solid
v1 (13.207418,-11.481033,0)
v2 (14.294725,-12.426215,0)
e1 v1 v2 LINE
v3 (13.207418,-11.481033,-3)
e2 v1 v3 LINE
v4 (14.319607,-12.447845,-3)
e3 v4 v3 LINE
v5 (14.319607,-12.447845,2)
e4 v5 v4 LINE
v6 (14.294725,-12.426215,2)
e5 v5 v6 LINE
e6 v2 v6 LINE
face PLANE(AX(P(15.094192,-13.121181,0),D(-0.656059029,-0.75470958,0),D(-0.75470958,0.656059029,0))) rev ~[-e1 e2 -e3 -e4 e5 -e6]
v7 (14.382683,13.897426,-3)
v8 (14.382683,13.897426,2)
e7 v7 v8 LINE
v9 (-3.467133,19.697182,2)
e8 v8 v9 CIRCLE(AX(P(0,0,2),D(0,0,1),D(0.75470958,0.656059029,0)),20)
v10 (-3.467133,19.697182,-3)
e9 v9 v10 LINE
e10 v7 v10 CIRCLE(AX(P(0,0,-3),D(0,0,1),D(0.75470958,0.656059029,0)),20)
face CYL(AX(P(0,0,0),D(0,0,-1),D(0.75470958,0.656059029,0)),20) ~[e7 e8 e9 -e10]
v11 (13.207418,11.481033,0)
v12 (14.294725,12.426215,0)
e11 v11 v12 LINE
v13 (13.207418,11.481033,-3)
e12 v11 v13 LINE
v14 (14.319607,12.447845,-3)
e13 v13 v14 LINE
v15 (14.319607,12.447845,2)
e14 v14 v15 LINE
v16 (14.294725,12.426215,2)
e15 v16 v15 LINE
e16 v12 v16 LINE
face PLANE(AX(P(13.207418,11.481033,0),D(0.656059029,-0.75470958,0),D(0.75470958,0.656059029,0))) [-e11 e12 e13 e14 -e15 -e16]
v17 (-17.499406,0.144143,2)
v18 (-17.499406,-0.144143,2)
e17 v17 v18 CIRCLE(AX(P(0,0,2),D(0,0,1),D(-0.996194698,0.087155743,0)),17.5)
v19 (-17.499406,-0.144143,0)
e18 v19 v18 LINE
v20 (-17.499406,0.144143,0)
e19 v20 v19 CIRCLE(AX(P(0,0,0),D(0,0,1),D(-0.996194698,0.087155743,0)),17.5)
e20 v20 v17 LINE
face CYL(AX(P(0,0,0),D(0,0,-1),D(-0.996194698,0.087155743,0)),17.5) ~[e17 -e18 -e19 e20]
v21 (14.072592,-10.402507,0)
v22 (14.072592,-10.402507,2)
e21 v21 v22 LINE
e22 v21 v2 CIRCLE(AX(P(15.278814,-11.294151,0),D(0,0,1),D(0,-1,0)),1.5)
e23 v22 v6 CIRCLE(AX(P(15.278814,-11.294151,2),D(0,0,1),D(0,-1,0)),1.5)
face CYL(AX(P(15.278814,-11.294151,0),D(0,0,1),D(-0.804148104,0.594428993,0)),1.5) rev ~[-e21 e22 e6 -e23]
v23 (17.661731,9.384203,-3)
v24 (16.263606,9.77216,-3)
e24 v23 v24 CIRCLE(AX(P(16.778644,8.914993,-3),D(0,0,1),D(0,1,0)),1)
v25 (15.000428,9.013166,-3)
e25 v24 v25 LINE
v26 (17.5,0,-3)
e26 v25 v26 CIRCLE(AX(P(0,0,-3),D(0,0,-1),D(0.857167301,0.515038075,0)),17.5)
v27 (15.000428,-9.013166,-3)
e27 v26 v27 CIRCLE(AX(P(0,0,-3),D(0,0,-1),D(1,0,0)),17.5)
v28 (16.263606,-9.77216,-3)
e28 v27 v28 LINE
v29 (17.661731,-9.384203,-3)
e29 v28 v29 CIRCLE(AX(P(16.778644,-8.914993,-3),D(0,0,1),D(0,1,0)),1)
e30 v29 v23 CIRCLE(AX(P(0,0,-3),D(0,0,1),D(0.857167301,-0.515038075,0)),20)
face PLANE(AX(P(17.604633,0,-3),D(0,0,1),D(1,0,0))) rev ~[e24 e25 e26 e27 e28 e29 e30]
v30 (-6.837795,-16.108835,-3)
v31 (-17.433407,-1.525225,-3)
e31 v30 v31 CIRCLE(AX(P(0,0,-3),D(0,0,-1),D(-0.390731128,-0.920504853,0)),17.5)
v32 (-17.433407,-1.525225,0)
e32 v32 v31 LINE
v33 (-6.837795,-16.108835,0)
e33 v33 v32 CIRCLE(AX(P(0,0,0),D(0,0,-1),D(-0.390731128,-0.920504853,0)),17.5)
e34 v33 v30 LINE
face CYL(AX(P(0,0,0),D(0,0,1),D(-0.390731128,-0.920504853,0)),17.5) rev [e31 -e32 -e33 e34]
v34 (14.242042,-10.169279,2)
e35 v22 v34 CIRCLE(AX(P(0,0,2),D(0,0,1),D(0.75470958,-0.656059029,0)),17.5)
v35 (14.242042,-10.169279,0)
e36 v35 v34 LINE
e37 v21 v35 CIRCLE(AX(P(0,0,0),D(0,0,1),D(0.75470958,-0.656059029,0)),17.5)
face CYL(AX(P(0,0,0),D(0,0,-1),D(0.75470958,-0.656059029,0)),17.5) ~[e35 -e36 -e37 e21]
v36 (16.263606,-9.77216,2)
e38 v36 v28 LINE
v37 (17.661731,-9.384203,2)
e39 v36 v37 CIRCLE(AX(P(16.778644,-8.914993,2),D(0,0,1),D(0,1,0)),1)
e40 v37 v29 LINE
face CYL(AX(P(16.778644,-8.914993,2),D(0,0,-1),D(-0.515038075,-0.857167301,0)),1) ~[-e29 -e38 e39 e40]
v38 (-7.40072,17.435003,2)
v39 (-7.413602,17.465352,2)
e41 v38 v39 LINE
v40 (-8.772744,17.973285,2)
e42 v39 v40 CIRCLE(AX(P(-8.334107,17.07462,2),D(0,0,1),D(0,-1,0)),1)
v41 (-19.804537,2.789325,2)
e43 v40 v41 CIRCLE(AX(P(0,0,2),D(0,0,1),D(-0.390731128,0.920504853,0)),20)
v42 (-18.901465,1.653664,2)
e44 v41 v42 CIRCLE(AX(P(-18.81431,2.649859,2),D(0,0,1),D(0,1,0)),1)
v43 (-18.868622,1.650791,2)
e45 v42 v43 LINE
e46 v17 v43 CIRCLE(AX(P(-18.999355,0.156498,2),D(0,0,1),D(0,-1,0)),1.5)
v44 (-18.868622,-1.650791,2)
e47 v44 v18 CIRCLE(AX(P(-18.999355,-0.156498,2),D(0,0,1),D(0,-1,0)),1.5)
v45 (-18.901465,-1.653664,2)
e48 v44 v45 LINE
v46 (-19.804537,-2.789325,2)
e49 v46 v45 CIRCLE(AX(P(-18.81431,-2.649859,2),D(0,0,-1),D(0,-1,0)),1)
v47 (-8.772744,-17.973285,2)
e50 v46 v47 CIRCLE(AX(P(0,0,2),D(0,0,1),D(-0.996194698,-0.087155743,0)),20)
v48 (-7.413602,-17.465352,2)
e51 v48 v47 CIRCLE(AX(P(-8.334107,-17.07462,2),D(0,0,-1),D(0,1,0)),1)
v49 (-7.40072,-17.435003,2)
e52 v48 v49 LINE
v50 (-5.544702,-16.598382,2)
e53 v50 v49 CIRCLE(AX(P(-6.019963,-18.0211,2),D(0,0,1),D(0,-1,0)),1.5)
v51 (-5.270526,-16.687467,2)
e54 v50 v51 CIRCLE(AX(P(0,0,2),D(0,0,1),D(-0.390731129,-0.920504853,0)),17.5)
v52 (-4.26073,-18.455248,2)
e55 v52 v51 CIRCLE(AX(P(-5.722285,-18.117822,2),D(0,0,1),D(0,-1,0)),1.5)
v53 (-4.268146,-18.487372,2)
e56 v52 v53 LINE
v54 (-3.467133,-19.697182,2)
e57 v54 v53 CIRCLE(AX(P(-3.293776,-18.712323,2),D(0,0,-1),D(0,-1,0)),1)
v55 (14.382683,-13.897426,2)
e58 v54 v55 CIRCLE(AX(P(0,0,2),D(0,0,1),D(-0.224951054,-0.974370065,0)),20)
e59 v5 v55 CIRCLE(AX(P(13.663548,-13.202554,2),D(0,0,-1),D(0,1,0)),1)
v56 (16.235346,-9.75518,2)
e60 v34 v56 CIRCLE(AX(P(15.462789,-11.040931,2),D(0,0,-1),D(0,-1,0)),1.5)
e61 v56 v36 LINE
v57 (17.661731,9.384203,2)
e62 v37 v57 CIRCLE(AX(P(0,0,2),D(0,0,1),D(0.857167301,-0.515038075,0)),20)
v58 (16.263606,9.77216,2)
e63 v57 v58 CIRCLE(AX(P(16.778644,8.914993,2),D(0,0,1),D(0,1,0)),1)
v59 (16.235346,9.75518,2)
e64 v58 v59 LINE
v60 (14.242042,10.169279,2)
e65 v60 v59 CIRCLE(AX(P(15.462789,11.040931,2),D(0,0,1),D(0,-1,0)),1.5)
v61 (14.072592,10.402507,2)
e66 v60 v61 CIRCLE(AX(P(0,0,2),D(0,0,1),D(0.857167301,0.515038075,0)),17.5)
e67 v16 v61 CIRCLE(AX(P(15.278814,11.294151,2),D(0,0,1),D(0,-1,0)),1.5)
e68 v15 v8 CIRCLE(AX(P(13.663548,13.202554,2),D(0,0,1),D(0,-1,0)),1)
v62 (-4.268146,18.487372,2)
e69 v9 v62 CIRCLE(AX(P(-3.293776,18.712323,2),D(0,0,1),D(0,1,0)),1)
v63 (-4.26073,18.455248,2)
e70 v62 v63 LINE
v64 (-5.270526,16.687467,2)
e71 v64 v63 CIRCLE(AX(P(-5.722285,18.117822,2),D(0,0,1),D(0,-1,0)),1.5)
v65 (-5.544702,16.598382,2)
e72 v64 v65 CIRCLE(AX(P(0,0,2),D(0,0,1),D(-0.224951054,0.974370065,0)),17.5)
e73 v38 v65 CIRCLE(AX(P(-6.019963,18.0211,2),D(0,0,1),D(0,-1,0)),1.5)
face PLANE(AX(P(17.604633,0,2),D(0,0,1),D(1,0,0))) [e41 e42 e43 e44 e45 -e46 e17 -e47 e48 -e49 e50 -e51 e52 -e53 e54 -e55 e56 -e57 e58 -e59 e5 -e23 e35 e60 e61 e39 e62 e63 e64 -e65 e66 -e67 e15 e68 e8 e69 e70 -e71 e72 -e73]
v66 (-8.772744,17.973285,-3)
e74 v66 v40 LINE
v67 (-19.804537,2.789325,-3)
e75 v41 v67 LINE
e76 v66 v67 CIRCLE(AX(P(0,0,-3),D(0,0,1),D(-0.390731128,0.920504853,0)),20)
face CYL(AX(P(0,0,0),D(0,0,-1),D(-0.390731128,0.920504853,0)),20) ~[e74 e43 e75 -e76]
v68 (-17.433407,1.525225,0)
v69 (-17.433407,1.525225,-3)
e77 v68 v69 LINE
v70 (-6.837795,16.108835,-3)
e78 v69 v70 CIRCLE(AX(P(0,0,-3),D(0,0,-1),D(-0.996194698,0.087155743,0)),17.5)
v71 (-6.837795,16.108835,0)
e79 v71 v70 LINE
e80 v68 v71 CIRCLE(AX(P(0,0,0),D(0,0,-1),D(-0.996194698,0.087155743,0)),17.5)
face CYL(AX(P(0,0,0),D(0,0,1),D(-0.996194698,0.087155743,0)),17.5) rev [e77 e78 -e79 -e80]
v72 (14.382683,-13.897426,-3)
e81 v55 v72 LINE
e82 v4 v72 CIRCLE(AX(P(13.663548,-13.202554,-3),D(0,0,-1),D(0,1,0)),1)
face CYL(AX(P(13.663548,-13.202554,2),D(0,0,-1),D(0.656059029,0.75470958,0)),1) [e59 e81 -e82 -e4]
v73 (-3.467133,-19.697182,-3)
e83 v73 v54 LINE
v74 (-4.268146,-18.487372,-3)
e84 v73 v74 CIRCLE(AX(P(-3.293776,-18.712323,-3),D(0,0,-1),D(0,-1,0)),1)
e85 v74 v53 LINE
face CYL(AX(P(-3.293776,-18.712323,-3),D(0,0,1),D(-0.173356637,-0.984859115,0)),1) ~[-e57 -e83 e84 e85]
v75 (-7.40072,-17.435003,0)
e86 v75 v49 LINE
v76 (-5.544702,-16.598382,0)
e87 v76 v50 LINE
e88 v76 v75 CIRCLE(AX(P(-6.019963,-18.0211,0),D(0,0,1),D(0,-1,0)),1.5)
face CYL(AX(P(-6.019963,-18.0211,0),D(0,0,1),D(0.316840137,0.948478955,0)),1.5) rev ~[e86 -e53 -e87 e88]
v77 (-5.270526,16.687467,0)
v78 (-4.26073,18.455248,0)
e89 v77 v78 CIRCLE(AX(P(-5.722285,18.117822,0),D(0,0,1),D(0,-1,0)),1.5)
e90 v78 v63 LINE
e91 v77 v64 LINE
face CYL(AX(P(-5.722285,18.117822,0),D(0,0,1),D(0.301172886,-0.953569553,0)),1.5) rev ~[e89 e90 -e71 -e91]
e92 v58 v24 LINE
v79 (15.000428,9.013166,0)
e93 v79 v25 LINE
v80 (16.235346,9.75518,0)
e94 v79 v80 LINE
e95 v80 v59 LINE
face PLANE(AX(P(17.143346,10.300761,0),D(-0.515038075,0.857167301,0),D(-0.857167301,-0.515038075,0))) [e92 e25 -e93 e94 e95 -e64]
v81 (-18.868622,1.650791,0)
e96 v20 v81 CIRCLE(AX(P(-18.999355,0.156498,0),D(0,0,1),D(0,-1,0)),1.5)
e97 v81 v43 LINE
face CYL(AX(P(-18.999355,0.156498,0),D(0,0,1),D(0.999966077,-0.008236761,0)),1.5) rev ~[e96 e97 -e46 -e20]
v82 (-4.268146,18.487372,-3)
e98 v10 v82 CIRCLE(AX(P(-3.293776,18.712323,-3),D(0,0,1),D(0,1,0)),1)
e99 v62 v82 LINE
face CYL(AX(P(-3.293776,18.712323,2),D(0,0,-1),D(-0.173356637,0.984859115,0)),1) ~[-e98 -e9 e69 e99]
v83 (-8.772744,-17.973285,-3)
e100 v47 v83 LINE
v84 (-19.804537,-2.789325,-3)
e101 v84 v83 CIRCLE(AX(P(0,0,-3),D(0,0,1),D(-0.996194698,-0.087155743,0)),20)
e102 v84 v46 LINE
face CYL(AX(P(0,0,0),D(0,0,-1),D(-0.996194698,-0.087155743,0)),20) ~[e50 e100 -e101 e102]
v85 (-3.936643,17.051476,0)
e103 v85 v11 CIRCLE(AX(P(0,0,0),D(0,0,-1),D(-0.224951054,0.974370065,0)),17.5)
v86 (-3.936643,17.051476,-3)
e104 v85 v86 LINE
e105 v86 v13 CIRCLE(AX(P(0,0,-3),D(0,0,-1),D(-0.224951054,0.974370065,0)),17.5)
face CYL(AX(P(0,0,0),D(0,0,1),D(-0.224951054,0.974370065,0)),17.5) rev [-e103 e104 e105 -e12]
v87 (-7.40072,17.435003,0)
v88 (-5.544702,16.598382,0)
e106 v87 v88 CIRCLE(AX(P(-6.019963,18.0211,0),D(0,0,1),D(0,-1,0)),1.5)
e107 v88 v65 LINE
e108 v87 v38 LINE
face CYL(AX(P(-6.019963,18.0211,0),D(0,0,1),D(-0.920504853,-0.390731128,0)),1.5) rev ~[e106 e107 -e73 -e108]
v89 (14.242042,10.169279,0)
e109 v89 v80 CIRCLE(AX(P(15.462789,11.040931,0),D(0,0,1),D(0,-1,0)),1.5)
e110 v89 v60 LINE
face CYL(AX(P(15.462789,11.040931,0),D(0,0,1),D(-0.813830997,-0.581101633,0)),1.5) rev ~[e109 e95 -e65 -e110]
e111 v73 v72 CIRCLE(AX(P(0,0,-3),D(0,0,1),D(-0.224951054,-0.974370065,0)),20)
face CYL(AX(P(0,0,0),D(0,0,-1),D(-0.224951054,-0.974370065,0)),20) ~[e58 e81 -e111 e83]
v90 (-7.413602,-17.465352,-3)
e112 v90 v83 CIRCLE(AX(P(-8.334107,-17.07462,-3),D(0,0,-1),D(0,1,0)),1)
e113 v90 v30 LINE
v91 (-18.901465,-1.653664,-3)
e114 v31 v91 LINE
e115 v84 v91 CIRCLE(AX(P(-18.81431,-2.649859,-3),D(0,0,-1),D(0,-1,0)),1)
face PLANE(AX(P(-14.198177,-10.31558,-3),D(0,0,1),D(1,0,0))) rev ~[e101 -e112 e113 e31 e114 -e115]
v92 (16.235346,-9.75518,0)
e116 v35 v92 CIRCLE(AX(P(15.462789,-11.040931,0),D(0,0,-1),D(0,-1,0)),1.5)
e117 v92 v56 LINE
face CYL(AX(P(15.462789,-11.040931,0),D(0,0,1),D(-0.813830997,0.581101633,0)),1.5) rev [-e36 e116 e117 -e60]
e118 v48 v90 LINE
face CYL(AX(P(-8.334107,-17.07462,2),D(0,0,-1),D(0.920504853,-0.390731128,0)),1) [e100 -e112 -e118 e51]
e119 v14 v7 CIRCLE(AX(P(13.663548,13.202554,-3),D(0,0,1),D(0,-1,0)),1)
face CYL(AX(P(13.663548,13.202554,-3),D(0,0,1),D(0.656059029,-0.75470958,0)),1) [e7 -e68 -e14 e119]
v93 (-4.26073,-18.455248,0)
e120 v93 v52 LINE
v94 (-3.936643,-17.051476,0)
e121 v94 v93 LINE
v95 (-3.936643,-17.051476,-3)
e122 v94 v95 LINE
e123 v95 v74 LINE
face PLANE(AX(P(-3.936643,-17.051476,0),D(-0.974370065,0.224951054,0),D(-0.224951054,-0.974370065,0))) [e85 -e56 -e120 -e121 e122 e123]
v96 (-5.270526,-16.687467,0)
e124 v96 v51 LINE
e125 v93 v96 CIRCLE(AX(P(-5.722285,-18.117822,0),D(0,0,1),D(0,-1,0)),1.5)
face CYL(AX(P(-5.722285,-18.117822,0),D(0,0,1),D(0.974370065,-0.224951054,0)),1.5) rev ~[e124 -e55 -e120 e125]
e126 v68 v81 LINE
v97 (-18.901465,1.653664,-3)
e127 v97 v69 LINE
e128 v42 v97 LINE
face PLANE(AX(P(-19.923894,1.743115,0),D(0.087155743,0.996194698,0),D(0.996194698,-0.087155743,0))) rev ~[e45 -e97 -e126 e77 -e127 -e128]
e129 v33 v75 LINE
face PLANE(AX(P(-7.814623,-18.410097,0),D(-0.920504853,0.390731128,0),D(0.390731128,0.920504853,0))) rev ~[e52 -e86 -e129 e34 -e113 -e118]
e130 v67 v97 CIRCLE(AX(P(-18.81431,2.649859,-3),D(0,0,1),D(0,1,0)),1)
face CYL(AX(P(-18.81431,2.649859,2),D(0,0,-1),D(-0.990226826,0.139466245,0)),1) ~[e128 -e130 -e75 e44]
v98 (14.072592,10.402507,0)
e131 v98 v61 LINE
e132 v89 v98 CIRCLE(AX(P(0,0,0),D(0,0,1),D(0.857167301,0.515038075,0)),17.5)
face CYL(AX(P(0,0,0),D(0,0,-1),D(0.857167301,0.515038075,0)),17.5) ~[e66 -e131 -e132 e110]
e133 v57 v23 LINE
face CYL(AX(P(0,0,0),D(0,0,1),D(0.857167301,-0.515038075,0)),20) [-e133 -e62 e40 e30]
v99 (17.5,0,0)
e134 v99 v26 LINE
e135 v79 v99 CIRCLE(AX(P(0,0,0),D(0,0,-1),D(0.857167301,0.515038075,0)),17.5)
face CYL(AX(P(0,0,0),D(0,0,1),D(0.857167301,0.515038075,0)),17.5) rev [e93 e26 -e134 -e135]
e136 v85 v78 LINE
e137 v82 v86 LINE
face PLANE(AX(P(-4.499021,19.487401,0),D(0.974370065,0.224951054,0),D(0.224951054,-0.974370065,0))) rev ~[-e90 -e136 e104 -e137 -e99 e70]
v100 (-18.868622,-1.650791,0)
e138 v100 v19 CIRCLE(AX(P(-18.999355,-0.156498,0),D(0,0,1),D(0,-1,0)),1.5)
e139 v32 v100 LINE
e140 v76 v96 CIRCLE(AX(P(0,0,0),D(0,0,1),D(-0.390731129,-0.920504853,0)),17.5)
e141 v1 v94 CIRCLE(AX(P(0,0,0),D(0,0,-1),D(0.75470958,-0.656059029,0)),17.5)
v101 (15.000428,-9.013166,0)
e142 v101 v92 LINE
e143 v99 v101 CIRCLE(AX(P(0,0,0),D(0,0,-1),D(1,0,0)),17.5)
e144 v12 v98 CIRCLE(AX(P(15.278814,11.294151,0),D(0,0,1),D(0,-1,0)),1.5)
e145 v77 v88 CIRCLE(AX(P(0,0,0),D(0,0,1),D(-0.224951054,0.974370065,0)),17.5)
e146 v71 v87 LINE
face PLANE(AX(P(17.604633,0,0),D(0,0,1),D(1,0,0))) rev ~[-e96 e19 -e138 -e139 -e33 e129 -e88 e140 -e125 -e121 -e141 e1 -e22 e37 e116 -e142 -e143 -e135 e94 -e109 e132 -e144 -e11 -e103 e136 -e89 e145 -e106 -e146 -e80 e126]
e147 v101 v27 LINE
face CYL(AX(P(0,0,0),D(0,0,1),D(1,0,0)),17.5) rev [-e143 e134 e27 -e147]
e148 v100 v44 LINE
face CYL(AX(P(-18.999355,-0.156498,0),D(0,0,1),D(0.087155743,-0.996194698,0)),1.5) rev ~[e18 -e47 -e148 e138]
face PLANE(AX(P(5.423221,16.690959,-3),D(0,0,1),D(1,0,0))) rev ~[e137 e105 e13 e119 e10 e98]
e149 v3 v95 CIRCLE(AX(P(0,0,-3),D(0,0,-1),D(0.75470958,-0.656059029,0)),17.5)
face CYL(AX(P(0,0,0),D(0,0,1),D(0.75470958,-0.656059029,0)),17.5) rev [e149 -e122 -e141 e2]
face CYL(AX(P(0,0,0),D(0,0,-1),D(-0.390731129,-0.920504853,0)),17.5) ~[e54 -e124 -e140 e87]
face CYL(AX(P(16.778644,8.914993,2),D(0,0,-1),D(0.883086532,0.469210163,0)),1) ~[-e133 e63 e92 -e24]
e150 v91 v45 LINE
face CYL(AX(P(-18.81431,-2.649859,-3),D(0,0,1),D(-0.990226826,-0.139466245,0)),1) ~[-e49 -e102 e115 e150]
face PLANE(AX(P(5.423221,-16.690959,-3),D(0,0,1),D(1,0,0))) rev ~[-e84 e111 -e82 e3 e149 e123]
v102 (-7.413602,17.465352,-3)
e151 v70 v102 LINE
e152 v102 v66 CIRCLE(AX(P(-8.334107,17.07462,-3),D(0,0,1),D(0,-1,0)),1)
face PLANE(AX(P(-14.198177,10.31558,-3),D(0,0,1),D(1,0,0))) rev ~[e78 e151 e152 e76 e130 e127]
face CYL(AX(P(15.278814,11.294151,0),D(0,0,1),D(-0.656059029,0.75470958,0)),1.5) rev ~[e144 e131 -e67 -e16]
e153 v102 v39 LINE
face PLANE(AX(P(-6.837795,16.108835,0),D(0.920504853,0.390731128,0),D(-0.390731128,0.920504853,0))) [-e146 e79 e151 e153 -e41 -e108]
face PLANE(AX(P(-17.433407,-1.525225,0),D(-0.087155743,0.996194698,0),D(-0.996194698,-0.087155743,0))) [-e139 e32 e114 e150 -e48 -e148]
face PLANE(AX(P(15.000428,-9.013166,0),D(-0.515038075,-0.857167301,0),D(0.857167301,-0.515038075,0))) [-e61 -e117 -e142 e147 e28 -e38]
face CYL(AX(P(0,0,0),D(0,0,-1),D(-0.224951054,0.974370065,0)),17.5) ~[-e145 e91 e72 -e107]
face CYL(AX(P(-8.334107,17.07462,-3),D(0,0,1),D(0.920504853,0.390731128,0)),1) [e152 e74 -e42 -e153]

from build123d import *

# Parameters (mm, degrees)
F1_DEPTH      = 2
F2_DEPTH      = 2
F2_DEPTH_BACK = 3
F3_R          = 1.5
F4_R          = 1


with BuildPart() as f1:
    # F0 (on Top) → F1 (new body)
    with BuildSketch(Plane.XY):
        with BuildLine():
            ThreePointArc((15.0004277623, -9.0131663109), (16.8635329312, -4.6766715814), (17.5, 0))
            ThreePointArc((17.5, 0), (16.8635329312, 4.6766715814), (15.0004277623, 9.0131663109))
            ThreePointArc((15.0004277623, 9.0131663109), (14.1577974016, 10.2862419151), (13.2074176539, 11.4810330073))
            ThreePointArc((13.2074176539, 11.4810330073), (5.4077974016, 16.6434890352), (-3.936643451, 17.0514761337))
            ThreePointArc((-3.936643451, 17.0514761337), (-5.4077974016, 16.6434890352), (-6.8377947486, 16.1088349354))
            ThreePointArc((-6.8377947486, 16.1088349354), (-14.1577974016, 10.2862419151), (-17.4334072166, 1.5252254981))
            ThreePointArc((-17.4334072166, 1.5252254981), (-17.5, 0), (-17.4334072166, -1.5252254981))
            ThreePointArc((-17.4334072166, -1.5252254981), (-14.1577974016, -10.2862419151), (-6.8377947486, -16.1088349354))
            ThreePointArc((-6.8377947486, -16.1088349354), (-5.4077974016, -16.6434890352), (-3.936643451, -17.0514761337))
            ThreePointArc((-3.936643451, -17.0514761337), (5.4077974016, -16.6434890352), (13.2074176539, -11.4810330073))
            ThreePointArc((13.2074176539, -11.4810330073), (14.1577974016, -10.2862419151), (15.0004277623, -9.0131663109))
        make_face()
    extrude(amount=F1_DEPTH)

    # F0 (on Top) → F2 (join, two sides)
    with BuildSketch(Plane.XY) as f2_sk:
        with BuildLine():
            ThreePointArc((15.0004277623, 9.0131663109), (16.8635329312, 4.6766715814), (17.5, 0))
            ThreePointArc((17.5, 0), (16.8635329312, -4.6766715814), (15.0004277623, -9.0131663109))
            Line((15.0004277623, -9.0131663109), (17.143346014, -10.3007614982))
            ThreePointArc((17.143346014, -10.3007614982), (20, 0), (17.143346014, 10.3007614982))
            Line((17.143346014, 10.3007614982), (15.0004277623, 9.0131663109))
        make_face()
        with BuildLine():
            ThreePointArc((-3.936643451, 17.0514761337), (5.4077974016, 16.6434890352), (13.2074176539, 11.4810330073))
            Line((13.2074176539, 11.4810330073), (15.0941916045, 13.1211805798))
            ThreePointArc((15.0941916045, 13.1211805798), (6.1803398875, 19.0211303259), (-4.4990210869, 19.4874012957))
            Line((-4.4990210869, 19.4874012957), (-3.936643451, 17.0514761337))
        make_face()
        with BuildLine():
            ThreePointArc((-17.4334072166, 1.5252254981), (-14.1577974016, 10.2862419151), (-6.8377947486, 16.1088349354))
            Line((-6.8377947486, 16.1088349354), (-7.8146225698, 18.410097069))
            ThreePointArc((-7.8146225698, 18.410097069), (-16.1803398875, 11.7557050458), (-19.9238939618, 1.743114855))
            Line((-19.9238939618, 1.743114855), (-17.4334072166, 1.5252254981))
        make_face()
        with BuildLine():
            Line((-7.8146225698, -18.410097069), (-6.8377947486, -16.1088349354))
            ThreePointArc((-6.8377947486, -16.1088349354), (-14.1577974016, -10.2862419151), (-17.4334072166, -1.5252254981))
            Line((-17.4334072166, -1.5252254981), (-19.9238939618, -1.743114855))
            ThreePointArc((-19.9238939618, -1.743114855), (-16.1803398875, -11.7557050458), (-7.8146225698, -18.410097069))
        make_face()
        with BuildLine():
            Line((15.0941916045, -13.1211805798), (13.2074176539, -11.4810330073))
            ThreePointArc((13.2074176539, -11.4810330073), (5.4077974016, -16.6434890352), (-3.936643451, -17.0514761337))
            Line((-3.936643451, -17.0514761337), (-4.4990210869, -19.4874012957))
            ThreePointArc((-4.4990210869, -19.4874012957), (6.1803398875, -19.0211303259), (15.0941916045, -13.1211805798))
        make_face()
    extrude(amount=F2_DEPTH)
    extrude(f2_sk.sketch, amount=-F2_DEPTH_BACK)

    # F3
    f3_edges = [f1.edges().sort_by_distance(p)[0] for p in [
        (-17.433407, 1.525225, 1),
        (-17.433407, -1.525225, 1),
        (-3.936643, -17.051476, 1),
        (-6.837795, -16.108835, 1),
        (15.000428, -9.013166, 1),
        (13.207418, -11.481033, 1),
        (13.207418, 11.481033, 1),
        (15.000428, 9.013166, 1),
        (-6.837795, 16.108835, 1),
        (-3.936643, 17.051476, 1),
    ]]
    fillet(f3_edges, radius=F3_R)

    # F4
    f4_edges = [f1.edges().sort_by_distance(p)[0] for p in [
        (15.094192, -13.121181, -0.5),
        (17.143346, -10.300761, -0.5),
        (17.143346, 10.300761, -0.5),
        (15.094192, 13.121181, -0.5),
        (-4.499021, 19.487401, -0.5),
        (-7.814623, 18.410097, -0.5),
        (-19.923894, 1.743115, -0.5),
        (-19.923894, -1.743115, -0.5),
        (-4.499021, -19.487401, -0.5),
        (-7.814623, -18.410097, -0.5),
    ]]
    fillet(f4_edges, radius=F4_R)


solid = f1.part
